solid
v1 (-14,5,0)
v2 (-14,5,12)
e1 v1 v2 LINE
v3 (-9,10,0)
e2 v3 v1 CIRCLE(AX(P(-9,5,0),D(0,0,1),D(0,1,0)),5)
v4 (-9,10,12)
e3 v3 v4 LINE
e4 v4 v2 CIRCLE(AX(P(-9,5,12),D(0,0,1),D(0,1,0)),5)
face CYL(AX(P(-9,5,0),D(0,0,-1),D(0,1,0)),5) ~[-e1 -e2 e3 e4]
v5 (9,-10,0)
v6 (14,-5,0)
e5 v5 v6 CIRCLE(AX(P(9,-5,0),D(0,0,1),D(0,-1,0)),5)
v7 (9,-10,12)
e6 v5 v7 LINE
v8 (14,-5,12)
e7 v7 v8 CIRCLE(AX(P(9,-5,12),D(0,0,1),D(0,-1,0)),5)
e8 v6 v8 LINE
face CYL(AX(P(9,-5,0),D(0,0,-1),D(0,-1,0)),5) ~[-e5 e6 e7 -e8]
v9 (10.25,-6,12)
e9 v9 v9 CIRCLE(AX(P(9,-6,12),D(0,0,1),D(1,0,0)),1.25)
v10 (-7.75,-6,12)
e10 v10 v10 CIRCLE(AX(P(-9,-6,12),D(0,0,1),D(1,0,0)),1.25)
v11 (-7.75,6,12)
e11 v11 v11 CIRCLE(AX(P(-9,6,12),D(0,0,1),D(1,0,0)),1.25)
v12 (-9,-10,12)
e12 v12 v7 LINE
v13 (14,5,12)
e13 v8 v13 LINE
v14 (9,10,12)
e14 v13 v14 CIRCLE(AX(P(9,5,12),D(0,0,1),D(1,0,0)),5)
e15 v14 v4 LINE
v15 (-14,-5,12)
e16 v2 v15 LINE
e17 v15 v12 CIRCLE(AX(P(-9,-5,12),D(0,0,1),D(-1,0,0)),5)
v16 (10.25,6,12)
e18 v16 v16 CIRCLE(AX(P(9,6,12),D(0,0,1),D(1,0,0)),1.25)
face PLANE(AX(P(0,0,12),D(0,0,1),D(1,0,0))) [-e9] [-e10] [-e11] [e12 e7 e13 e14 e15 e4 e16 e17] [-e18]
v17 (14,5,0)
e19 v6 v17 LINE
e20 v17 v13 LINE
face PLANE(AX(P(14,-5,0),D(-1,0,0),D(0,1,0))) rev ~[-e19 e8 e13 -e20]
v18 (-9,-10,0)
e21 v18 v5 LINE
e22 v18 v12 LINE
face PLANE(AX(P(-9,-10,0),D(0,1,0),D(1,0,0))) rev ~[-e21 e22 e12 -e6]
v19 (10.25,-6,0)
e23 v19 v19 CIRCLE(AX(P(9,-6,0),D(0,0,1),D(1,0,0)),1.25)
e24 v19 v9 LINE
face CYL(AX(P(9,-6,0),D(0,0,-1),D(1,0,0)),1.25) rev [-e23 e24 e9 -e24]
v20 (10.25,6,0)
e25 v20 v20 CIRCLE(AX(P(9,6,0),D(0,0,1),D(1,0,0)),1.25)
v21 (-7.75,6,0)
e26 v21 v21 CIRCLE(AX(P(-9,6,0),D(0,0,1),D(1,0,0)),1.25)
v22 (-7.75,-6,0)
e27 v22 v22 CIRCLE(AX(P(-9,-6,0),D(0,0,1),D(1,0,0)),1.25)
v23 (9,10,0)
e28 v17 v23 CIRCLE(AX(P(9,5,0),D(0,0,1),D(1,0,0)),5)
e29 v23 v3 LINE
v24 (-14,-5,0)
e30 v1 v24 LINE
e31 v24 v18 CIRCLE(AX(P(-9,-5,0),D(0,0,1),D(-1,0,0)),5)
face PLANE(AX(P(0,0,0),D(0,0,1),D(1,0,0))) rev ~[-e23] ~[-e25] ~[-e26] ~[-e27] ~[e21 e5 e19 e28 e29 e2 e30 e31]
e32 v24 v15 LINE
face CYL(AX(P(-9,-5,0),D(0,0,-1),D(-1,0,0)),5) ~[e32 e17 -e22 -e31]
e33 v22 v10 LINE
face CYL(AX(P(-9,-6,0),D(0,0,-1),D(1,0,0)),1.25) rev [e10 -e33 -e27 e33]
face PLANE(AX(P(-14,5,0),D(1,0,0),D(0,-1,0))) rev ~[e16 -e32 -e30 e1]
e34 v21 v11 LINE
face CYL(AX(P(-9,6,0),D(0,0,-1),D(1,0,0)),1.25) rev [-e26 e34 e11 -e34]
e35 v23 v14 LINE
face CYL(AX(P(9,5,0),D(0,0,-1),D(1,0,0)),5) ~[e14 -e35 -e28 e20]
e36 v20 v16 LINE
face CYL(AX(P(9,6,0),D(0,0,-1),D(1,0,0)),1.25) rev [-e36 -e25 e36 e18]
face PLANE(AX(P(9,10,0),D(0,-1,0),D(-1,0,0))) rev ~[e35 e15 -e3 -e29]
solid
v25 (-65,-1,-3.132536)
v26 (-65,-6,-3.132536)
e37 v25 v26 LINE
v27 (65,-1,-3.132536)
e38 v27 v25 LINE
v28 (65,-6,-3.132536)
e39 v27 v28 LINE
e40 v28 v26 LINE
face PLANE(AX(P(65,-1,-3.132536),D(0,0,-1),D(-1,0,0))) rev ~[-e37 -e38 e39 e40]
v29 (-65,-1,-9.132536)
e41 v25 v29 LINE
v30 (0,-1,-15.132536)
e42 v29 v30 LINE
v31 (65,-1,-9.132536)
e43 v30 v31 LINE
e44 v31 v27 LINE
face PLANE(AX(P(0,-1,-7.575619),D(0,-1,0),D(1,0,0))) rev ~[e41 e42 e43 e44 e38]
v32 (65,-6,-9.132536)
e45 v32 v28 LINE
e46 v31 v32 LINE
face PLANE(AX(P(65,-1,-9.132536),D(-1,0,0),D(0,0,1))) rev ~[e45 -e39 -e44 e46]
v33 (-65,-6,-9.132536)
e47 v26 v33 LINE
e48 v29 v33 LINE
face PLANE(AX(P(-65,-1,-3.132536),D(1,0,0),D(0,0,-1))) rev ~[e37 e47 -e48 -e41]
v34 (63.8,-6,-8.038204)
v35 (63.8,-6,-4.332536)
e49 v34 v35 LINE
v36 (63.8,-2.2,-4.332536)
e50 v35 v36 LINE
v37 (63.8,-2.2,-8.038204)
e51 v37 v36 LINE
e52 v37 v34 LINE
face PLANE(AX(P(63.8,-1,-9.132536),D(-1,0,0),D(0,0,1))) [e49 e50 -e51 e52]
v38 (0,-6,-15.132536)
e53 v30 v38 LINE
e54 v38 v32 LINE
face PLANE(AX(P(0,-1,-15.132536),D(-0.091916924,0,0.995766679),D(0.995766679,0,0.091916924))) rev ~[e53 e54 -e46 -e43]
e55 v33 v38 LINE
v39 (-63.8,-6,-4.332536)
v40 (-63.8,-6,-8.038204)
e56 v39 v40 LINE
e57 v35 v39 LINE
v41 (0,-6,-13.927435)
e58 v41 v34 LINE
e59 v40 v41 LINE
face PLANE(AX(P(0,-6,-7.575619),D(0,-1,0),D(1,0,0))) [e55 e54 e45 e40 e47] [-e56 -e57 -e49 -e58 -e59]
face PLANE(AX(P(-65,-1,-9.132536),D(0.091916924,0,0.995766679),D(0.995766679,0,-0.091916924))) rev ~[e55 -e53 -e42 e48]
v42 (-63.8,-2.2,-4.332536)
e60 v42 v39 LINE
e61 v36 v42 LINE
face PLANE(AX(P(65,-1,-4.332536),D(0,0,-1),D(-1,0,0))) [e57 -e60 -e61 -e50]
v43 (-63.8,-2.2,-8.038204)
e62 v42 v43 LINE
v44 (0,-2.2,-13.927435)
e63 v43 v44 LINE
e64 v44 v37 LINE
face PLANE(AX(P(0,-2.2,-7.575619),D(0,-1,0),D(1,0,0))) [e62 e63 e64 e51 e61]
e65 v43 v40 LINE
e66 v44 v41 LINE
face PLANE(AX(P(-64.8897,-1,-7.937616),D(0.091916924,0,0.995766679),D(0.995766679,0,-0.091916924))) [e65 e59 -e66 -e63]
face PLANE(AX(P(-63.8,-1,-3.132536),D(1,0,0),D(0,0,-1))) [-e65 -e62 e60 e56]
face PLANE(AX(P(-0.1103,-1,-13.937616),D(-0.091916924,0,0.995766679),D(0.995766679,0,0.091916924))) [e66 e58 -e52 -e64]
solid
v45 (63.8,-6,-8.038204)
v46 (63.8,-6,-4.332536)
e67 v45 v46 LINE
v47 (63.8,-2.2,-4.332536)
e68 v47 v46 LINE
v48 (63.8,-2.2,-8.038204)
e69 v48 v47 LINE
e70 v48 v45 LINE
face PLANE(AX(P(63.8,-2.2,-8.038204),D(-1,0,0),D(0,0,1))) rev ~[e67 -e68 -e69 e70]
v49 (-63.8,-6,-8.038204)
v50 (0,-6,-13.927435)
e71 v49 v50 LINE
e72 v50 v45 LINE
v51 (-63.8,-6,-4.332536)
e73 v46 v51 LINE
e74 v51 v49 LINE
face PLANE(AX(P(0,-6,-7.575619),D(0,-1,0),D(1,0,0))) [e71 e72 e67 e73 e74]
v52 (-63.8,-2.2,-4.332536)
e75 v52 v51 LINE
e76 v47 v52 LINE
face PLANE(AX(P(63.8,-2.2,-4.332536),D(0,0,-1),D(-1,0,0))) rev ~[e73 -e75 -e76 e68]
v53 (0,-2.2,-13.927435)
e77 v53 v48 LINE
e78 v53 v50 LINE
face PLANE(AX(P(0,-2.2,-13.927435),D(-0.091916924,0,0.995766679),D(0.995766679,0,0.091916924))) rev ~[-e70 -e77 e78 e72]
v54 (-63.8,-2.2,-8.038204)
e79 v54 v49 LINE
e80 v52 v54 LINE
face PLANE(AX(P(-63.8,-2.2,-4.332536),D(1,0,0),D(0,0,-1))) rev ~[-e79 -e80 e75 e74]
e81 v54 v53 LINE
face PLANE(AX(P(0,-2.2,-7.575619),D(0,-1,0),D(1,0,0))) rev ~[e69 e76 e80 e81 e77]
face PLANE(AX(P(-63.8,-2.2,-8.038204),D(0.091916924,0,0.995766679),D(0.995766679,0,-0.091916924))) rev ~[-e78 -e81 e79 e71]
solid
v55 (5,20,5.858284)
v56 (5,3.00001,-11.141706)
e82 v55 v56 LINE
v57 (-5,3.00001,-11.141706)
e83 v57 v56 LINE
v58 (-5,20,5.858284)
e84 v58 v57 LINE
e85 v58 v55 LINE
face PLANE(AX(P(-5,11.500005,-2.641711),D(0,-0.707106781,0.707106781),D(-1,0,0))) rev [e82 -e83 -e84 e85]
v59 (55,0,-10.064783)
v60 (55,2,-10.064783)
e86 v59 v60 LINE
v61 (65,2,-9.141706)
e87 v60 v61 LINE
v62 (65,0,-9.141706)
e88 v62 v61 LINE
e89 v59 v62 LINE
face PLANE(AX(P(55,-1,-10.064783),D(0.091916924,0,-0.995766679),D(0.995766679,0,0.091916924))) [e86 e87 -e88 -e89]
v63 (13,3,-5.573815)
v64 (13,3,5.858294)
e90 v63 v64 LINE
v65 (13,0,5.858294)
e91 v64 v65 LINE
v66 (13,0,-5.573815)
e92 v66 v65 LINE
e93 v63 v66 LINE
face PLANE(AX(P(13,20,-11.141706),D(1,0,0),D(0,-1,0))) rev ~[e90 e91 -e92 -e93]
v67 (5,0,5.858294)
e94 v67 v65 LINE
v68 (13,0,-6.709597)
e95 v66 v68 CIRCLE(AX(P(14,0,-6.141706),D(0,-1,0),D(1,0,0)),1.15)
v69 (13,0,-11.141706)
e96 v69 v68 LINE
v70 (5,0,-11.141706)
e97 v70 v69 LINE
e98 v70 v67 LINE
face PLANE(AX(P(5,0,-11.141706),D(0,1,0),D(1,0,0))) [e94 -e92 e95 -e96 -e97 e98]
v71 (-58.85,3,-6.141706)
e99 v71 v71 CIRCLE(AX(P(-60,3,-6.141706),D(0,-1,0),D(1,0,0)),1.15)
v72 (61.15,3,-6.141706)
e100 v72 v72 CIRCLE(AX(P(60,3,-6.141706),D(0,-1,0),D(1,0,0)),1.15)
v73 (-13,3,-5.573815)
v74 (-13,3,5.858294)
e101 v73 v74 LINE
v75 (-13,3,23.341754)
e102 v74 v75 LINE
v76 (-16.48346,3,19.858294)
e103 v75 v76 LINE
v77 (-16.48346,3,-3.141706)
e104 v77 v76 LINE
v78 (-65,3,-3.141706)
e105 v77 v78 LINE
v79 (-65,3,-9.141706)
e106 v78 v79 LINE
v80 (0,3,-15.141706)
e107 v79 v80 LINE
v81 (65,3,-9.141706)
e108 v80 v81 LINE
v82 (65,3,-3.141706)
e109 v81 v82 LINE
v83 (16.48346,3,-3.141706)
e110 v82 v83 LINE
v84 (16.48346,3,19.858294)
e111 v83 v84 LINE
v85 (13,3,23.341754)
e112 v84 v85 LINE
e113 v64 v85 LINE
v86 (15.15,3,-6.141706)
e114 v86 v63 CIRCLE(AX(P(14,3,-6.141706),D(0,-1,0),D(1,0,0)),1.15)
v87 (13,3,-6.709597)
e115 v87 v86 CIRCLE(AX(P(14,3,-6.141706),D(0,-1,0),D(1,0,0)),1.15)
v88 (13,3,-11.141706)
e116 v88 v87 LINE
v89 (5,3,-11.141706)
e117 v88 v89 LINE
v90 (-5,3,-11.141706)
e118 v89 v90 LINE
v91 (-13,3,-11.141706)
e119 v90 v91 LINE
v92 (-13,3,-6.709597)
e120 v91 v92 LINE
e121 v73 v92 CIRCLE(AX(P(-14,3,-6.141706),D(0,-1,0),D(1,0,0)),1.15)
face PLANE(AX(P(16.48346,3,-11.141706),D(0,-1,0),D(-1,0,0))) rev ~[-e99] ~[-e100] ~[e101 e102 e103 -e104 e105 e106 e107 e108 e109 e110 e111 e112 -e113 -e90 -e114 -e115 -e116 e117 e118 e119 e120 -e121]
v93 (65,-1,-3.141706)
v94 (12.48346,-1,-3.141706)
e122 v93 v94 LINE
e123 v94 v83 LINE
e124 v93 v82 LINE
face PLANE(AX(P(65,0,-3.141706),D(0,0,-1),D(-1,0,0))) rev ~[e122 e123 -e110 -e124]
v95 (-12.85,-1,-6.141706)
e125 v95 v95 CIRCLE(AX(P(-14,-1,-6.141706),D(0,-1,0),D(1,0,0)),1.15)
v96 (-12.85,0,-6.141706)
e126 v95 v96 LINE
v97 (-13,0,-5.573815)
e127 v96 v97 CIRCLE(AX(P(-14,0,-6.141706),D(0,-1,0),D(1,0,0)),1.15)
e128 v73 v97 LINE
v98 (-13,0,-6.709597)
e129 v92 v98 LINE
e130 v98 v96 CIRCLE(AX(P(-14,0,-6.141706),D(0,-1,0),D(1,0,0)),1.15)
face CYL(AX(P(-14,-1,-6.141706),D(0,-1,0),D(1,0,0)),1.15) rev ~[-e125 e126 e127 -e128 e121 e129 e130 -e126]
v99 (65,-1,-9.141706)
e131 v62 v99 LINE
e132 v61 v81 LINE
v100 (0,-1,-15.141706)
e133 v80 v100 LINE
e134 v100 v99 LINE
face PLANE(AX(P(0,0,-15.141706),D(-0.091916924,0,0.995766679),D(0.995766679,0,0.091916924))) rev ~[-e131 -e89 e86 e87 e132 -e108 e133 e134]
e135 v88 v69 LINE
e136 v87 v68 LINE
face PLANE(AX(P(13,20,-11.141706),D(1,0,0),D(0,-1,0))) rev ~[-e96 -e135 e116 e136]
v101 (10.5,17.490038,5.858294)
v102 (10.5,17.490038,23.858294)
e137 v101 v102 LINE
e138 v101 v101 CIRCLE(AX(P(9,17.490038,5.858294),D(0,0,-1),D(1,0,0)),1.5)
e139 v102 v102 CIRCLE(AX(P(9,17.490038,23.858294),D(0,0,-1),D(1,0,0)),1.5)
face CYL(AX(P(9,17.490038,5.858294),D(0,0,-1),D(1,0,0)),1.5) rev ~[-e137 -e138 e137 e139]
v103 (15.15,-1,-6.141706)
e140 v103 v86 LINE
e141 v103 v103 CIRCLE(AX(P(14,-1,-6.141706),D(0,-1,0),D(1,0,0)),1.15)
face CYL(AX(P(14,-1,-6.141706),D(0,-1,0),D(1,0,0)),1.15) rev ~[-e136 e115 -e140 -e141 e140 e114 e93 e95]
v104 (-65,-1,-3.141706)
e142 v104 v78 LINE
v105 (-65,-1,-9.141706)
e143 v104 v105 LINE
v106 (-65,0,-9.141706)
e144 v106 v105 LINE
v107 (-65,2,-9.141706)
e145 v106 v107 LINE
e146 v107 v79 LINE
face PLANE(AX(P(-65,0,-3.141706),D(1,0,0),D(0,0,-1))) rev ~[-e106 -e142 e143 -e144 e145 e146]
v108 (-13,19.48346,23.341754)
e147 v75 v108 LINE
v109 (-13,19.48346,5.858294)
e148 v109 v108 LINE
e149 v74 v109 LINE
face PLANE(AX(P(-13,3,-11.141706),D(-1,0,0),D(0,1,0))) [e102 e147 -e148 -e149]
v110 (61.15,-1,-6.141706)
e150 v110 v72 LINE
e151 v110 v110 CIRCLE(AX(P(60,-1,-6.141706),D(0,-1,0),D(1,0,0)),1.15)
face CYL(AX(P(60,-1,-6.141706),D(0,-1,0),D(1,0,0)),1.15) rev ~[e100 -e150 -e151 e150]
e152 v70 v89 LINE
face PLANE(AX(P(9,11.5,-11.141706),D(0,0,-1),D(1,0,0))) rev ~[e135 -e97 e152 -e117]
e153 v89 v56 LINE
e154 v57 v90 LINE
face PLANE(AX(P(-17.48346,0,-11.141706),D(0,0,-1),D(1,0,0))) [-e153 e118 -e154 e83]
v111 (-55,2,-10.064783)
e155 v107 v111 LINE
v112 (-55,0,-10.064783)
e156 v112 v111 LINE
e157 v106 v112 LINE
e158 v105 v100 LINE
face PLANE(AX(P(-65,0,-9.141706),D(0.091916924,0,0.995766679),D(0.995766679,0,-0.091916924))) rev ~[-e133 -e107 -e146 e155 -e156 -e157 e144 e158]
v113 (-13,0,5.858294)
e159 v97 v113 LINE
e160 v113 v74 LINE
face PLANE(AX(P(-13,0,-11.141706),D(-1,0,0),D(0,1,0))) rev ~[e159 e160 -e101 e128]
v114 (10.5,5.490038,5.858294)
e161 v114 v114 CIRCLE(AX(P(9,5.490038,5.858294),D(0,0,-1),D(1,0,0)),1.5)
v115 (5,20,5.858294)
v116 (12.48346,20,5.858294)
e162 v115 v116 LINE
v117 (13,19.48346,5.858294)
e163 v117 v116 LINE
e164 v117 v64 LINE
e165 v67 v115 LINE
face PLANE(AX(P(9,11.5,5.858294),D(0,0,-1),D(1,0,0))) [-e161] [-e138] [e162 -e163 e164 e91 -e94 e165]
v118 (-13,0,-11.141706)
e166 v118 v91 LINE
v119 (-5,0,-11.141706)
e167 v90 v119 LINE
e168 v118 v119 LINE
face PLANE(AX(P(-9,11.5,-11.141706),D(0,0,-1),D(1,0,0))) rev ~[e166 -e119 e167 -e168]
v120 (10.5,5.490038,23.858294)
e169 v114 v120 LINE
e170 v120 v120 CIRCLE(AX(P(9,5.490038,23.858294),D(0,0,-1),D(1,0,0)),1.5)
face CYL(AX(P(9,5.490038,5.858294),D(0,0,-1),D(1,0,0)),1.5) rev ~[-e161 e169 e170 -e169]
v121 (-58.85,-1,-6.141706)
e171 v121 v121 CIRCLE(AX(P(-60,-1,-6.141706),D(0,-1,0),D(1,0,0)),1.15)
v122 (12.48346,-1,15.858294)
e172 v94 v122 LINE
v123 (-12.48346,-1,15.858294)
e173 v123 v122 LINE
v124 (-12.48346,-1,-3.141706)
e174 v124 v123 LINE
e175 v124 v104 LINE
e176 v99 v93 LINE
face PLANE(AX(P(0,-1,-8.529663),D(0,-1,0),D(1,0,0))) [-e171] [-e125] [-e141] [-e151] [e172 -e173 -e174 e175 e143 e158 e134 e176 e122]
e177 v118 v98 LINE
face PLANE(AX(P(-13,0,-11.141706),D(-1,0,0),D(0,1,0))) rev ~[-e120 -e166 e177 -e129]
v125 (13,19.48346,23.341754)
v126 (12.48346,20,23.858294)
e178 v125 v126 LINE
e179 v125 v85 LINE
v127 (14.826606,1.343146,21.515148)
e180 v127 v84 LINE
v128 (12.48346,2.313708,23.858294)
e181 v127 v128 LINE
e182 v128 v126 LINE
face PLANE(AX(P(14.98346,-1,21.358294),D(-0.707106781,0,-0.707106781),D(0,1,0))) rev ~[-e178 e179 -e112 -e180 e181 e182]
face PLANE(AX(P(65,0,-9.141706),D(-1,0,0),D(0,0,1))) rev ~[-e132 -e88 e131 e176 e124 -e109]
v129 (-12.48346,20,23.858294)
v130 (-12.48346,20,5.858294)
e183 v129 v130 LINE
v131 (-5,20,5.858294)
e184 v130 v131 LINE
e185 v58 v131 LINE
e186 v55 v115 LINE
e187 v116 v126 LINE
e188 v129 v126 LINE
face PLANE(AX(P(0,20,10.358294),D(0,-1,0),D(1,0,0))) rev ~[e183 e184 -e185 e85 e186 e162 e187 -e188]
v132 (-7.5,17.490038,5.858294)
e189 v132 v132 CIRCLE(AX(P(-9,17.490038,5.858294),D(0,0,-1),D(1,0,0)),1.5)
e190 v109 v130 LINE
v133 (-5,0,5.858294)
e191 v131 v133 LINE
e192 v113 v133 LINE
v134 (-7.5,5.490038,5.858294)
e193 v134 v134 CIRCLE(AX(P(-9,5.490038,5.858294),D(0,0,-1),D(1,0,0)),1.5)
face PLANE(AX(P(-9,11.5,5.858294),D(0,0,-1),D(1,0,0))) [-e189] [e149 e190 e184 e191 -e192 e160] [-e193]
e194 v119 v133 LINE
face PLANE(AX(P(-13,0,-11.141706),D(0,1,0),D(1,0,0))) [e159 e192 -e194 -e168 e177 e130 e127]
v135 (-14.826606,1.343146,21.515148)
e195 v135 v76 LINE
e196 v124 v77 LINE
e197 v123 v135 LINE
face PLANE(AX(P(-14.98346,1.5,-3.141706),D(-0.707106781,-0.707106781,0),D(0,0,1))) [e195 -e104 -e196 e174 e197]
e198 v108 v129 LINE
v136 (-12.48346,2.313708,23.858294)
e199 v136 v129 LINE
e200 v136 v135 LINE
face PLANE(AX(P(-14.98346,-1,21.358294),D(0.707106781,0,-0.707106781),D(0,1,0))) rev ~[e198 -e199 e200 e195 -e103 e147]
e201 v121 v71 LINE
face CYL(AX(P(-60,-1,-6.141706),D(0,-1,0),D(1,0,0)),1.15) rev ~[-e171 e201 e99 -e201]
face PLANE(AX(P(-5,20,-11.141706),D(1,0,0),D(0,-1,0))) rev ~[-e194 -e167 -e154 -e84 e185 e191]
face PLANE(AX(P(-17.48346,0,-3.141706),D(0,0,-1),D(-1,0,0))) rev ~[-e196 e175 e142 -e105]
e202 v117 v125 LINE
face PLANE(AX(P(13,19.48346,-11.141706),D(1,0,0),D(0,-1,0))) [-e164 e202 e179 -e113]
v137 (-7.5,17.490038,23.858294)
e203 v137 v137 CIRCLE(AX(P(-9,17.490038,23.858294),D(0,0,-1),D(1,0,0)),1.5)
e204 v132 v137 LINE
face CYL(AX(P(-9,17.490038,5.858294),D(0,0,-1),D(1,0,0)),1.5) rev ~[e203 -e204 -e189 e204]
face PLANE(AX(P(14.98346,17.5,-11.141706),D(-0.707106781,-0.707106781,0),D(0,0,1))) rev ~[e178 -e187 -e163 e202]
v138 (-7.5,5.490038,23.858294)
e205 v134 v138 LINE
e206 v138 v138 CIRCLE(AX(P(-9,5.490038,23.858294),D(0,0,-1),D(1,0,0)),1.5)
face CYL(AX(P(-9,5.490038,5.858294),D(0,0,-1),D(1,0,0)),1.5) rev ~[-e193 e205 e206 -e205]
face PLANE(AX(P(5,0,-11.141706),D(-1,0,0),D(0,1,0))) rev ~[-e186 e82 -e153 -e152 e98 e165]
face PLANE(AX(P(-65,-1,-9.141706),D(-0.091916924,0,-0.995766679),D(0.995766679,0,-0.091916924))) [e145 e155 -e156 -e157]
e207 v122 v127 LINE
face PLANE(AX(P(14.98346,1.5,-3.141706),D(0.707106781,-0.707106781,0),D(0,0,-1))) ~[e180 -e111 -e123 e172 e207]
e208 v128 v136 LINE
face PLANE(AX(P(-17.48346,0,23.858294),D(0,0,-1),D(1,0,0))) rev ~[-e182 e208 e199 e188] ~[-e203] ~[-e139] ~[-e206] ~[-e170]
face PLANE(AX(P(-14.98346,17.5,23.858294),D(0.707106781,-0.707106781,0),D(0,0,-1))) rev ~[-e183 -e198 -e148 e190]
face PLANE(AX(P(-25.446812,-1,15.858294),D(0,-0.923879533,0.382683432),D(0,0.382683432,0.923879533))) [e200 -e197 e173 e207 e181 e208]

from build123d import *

# Parameters (mm, degrees)
F0_R         = 1.25
F1_DEPTH     = 12
F2_W         = 34.9669195712
F2_H         = 27
F2_H_2       = 8
F3_DEPTH     = 1
F4_DEPTH     = 20
F5_R         = 1.15
F6_DEPTH     = 3
F7_DEPTH     = 4
F8_DEPTH     = 10
F9_W         = 8
F9_H         = 17
F9_H_2       = 3
F10_DEPTH    = 17
F11_R        = 1.5
F12_DEPTH    = 18
F14_DEPTH    = 5
F15_T        = -1.2
F16_DEPTH    = 3.8
F19_SIZE     = 5
F20_SIZE     = 16.99999
F21_SIZE     = 3
F22_T1_DEPTH = 50.8936235002
F23_DEPTH    = 35


# Not quite as in the source:
# - a fillet or chamfer that OpenCascade refuses, or shapes differently, is made with other operations: its cross-section is extruded or revolved along the edge and cut away or added
# - a fillet or chamfer is up to 0.001 mm smaller than in the source, because OpenCascade refuses the exact size


with BuildPart() as f1:
    # F0 (on Top) → F1 (new body)
    with BuildSketch(Plane.XY):
        with BuildLine():
            ThreePointArc((14, 5), (12.5355339059, 8.5355339059), (9, 10))
            Line((9, 10), (-9, 10))
            ThreePointArc((-9, 10), (-12.5355339059, 8.5355339059), (-14, 5))
            Line((-14, 5), (-14, -5))
            ThreePointArc((-14, -5), (-12.5355339059, -8.5355339059), (-9, -10))
            Line((-9, -10), (9, -10))
            ThreePointArc((9, -10), (12.5355339059, -8.5355339059), (14, -5))
            Line((14, -5), (14, 5))
        make_face()
        with Locations((-9, -6)):
            Circle(F0_R, mode=Mode.SUBTRACT)
        with Locations((9, -6)):
            Circle(F0_R, mode=Mode.SUBTRACT)
        with Locations((-9, 6)):
            Circle(F0_R, mode=Mode.SUBTRACT)
        with Locations((9, 6)):
            Circle(F0_R, mode=Mode.SUBTRACT)
    extrude(amount=F1_DEPTH)


with BuildPart() as f3:
    # F2 (on Front) → F3 (new body)
    with BuildSketch(Plane.XZ):
        Polygon((-17.4834597856, -3.1417060565), (-65, -3.1417060565), (-65, -9.1417060565), (0, -15.1417060565), (65, -9.1417060565), (65, -3.1417060565), (17.4834597856, -3.1417060565), (17.4834597856, -11.1417060565), (-17.4834597856, -11.1417060565), align=None)
        with Locations((0, 10.3582939435)):
            Rectangle(F2_W, F2_H)
        with Locations((0, -7.1417060565)):
            Rectangle(F2_W, F2_H_2)
    extrude(amount=F3_DEPTH)

    # F2 (on Front) → F4 (join)
    with BuildSketch(Plane.XZ):
        with Locations((0, 10.3582939435)):
            Rectangle(F2_W, F2_H)
        with Locations((0, -7.1417060565)):
            Rectangle(F2_W, F2_H_2)
    extrude(amount=-F4_DEPTH)

    # F5 (on face) + F2 (on Front) → F6 (join)
    with BuildSketch(Plane.XZ.offset(1)):
        Polygon((-55, -10.0647829795), (-55, -3.1417060565), (-65, -3.1417060565), (-65, -9.1417060565), align=None)
        with Locations((-60, -6.1417060565)):
            Circle(F5_R, mode=Mode.SUBTRACT)
        Polygon((55, -3.1417060565), (55, -10.0647829795), (65, -9.1417060565), (65, -3.1417060565), align=None)
        with Locations((60, -6.1417060565)):
            Circle(F5_R, mode=Mode.SUBTRACT)
    with BuildSketch(Plane.XZ):
        Polygon((-17.4834597856, -3.1417060565), (-65, -3.1417060565), (-65, -9.1417060565), (0, -15.1417060565), (65, -9.1417060565), (65, -3.1417060565), (17.4834597856, -3.1417060565), (17.4834597856, -11.1417060565), (-17.4834597856, -11.1417060565), align=None)
    extrude(amount=-F6_DEPTH)

    # F5 (on face) → F7 (cut, through all)
    with BuildSketch(Plane.XZ.offset(1)):
        with Locations((-60, -6.1417060565)):
            Circle(F5_R)
        with Locations((60, -6.1417060565)):
            Circle(F5_R)
    extrude(amount=-F7_DEPTH, mode=Mode.SUBTRACT)

    # F5 (on face) → F8 (cut)
    with BuildSketch(Plane.XZ.offset(1)):
        with Locations((-14, -6.1417060565)):
            Circle(F5_R)
        with Locations((14, -6.1417060565)):
            Circle(F5_R)
    extrude(amount=-F8_DEPTH, mode=Mode.SUBTRACT)

    # F9 (on face) → F10 (cut)
    with BuildSketch(Plane(origin=(0, 0, -11.1417060565), x_dir=(1, 0, 0), z_dir=(0, 0, -1))):
        with Locations((9, -11.5)):
            Rectangle(F9_W, F9_H)
        with Locations((9, -1.5)):
            Rectangle(F9_W, F9_H_2)
        with Locations((-9, -11.5)):
            Rectangle(F9_W, F9_H)
        with Locations((-9, -1.5)):
            Rectangle(F9_W, F9_H_2)
    extrude(amount=-F10_DEPTH, mode=Mode.SUBTRACT)

    # F11 (on face) → F12 (cut, through all)
    with BuildSketch(Plane(origin=(0, 0, 5.8582939435), x_dir=(1, 0, 0), z_dir=(0, 0, -1))):
        with Locations((-9, -5.4900380783)):
            Circle(F11_R)
        with Locations((-9, -17.4900380783)):
            Circle(F11_R)
        with Locations((9, -5.4900380783)):
            Circle(F11_R)
        with Locations((9, -17.4900380783)):
            Circle(F11_R)
    extrude(amount=-F12_DEPTH, mode=Mode.SUBTRACT)

    # F19
    f19_edges = [f3.edges().sort_by_distance(p)[0] for p in [
        (-17.48346, -1, 10.358294),
        (17.48346, -1, 10.358294),
        (-17.48346, 20, 6.358294),
        (17.48346, 20, 6.358294),
        (-17.48346, 9.5, 23.858294),
        (17.48346, 9.5, 23.858294),
    ]]
    chamfer(f19_edges, length=F19_SIZE)

    # F20 (size 17 in the source; OpenCascade refuses exactly that, so slightly less here)
    f20_edges = [f3.edges().sort_by_distance(p)[0] for p in [
        (0, 20, -11.141706),
    ]]
    chamfer(f20_edges, length=F20_SIZE)

    # F21
    f21_edges = [f3.edges().sort_by_distance(p)[0] for p in [
        (0, -1, 23.858294),
    ]]
    chamfer(f21_edges, length=F21_SIZE)

    # F22: chamfer of 5 on 1 edges, made by hand

    # F22_s2 → F22_t1 (cut)
    with BuildSketch(Plane.YZ.offset(-25.4468117501)):
        Polygon((-1, 15.8582939435), (2.5355339059, 24.3938278495), (-1, 20.8582939435), align=None)
    extrude(amount=F22_T1_DEPTH, mode=Mode.SUBTRACT)

    # F23 (cut, through all): faces of the model
    f23_faces = [f3.faces().sort_by_distance(p)[0] for p in [
        (15.1081194146, 10.2337090854, -11.1417060565),
        (-15.1081194146, 10.2337090854, -11.1417060565),
    ]]
    extrude(f23_faces, amount=-F23_DEPTH, mode=Mode.SUBTRACT)


with BuildPart() as f14:
    # F13 (on face) → F14 (new body)
    with BuildSketch(Plane.XZ.offset(1)):
        Polygon((65, -2.4325364381), (-65, -2.4325364381), (-65, -8.4325364381), (0, -14.4325364381), (65, -8.4325364381), align=None)
    extrude(amount=F14_DEPTH)

    # F15
    f15_openings = [f14.faces().sort_by_distance(p)[0] for p in [
        (0, -6, -7.099203),
    ]]
    offset(amount=F15_T, openings=f15_openings)


with BuildPart() as f16:
    # F16 (new): a face of the model
    f16_faces = [f14.part.faces().sort_by_distance(p)[0] for p in [
        (0, -2.2, -7.1749809809),
    ]]
    extrude(f16_faces, amount=F16_DEPTH)


with BuildPart() as f14_1:
    # F17: moved
    add(f14.part.moved(Location((0, 0, -0.7))))


with BuildPart() as f16_1:
    # F18: moved
    add(f16.part.moved(Location((0, 0, -0.7))))


solid = Compound([f1.part, f3.part, f14_1.part, f16_1.part])
